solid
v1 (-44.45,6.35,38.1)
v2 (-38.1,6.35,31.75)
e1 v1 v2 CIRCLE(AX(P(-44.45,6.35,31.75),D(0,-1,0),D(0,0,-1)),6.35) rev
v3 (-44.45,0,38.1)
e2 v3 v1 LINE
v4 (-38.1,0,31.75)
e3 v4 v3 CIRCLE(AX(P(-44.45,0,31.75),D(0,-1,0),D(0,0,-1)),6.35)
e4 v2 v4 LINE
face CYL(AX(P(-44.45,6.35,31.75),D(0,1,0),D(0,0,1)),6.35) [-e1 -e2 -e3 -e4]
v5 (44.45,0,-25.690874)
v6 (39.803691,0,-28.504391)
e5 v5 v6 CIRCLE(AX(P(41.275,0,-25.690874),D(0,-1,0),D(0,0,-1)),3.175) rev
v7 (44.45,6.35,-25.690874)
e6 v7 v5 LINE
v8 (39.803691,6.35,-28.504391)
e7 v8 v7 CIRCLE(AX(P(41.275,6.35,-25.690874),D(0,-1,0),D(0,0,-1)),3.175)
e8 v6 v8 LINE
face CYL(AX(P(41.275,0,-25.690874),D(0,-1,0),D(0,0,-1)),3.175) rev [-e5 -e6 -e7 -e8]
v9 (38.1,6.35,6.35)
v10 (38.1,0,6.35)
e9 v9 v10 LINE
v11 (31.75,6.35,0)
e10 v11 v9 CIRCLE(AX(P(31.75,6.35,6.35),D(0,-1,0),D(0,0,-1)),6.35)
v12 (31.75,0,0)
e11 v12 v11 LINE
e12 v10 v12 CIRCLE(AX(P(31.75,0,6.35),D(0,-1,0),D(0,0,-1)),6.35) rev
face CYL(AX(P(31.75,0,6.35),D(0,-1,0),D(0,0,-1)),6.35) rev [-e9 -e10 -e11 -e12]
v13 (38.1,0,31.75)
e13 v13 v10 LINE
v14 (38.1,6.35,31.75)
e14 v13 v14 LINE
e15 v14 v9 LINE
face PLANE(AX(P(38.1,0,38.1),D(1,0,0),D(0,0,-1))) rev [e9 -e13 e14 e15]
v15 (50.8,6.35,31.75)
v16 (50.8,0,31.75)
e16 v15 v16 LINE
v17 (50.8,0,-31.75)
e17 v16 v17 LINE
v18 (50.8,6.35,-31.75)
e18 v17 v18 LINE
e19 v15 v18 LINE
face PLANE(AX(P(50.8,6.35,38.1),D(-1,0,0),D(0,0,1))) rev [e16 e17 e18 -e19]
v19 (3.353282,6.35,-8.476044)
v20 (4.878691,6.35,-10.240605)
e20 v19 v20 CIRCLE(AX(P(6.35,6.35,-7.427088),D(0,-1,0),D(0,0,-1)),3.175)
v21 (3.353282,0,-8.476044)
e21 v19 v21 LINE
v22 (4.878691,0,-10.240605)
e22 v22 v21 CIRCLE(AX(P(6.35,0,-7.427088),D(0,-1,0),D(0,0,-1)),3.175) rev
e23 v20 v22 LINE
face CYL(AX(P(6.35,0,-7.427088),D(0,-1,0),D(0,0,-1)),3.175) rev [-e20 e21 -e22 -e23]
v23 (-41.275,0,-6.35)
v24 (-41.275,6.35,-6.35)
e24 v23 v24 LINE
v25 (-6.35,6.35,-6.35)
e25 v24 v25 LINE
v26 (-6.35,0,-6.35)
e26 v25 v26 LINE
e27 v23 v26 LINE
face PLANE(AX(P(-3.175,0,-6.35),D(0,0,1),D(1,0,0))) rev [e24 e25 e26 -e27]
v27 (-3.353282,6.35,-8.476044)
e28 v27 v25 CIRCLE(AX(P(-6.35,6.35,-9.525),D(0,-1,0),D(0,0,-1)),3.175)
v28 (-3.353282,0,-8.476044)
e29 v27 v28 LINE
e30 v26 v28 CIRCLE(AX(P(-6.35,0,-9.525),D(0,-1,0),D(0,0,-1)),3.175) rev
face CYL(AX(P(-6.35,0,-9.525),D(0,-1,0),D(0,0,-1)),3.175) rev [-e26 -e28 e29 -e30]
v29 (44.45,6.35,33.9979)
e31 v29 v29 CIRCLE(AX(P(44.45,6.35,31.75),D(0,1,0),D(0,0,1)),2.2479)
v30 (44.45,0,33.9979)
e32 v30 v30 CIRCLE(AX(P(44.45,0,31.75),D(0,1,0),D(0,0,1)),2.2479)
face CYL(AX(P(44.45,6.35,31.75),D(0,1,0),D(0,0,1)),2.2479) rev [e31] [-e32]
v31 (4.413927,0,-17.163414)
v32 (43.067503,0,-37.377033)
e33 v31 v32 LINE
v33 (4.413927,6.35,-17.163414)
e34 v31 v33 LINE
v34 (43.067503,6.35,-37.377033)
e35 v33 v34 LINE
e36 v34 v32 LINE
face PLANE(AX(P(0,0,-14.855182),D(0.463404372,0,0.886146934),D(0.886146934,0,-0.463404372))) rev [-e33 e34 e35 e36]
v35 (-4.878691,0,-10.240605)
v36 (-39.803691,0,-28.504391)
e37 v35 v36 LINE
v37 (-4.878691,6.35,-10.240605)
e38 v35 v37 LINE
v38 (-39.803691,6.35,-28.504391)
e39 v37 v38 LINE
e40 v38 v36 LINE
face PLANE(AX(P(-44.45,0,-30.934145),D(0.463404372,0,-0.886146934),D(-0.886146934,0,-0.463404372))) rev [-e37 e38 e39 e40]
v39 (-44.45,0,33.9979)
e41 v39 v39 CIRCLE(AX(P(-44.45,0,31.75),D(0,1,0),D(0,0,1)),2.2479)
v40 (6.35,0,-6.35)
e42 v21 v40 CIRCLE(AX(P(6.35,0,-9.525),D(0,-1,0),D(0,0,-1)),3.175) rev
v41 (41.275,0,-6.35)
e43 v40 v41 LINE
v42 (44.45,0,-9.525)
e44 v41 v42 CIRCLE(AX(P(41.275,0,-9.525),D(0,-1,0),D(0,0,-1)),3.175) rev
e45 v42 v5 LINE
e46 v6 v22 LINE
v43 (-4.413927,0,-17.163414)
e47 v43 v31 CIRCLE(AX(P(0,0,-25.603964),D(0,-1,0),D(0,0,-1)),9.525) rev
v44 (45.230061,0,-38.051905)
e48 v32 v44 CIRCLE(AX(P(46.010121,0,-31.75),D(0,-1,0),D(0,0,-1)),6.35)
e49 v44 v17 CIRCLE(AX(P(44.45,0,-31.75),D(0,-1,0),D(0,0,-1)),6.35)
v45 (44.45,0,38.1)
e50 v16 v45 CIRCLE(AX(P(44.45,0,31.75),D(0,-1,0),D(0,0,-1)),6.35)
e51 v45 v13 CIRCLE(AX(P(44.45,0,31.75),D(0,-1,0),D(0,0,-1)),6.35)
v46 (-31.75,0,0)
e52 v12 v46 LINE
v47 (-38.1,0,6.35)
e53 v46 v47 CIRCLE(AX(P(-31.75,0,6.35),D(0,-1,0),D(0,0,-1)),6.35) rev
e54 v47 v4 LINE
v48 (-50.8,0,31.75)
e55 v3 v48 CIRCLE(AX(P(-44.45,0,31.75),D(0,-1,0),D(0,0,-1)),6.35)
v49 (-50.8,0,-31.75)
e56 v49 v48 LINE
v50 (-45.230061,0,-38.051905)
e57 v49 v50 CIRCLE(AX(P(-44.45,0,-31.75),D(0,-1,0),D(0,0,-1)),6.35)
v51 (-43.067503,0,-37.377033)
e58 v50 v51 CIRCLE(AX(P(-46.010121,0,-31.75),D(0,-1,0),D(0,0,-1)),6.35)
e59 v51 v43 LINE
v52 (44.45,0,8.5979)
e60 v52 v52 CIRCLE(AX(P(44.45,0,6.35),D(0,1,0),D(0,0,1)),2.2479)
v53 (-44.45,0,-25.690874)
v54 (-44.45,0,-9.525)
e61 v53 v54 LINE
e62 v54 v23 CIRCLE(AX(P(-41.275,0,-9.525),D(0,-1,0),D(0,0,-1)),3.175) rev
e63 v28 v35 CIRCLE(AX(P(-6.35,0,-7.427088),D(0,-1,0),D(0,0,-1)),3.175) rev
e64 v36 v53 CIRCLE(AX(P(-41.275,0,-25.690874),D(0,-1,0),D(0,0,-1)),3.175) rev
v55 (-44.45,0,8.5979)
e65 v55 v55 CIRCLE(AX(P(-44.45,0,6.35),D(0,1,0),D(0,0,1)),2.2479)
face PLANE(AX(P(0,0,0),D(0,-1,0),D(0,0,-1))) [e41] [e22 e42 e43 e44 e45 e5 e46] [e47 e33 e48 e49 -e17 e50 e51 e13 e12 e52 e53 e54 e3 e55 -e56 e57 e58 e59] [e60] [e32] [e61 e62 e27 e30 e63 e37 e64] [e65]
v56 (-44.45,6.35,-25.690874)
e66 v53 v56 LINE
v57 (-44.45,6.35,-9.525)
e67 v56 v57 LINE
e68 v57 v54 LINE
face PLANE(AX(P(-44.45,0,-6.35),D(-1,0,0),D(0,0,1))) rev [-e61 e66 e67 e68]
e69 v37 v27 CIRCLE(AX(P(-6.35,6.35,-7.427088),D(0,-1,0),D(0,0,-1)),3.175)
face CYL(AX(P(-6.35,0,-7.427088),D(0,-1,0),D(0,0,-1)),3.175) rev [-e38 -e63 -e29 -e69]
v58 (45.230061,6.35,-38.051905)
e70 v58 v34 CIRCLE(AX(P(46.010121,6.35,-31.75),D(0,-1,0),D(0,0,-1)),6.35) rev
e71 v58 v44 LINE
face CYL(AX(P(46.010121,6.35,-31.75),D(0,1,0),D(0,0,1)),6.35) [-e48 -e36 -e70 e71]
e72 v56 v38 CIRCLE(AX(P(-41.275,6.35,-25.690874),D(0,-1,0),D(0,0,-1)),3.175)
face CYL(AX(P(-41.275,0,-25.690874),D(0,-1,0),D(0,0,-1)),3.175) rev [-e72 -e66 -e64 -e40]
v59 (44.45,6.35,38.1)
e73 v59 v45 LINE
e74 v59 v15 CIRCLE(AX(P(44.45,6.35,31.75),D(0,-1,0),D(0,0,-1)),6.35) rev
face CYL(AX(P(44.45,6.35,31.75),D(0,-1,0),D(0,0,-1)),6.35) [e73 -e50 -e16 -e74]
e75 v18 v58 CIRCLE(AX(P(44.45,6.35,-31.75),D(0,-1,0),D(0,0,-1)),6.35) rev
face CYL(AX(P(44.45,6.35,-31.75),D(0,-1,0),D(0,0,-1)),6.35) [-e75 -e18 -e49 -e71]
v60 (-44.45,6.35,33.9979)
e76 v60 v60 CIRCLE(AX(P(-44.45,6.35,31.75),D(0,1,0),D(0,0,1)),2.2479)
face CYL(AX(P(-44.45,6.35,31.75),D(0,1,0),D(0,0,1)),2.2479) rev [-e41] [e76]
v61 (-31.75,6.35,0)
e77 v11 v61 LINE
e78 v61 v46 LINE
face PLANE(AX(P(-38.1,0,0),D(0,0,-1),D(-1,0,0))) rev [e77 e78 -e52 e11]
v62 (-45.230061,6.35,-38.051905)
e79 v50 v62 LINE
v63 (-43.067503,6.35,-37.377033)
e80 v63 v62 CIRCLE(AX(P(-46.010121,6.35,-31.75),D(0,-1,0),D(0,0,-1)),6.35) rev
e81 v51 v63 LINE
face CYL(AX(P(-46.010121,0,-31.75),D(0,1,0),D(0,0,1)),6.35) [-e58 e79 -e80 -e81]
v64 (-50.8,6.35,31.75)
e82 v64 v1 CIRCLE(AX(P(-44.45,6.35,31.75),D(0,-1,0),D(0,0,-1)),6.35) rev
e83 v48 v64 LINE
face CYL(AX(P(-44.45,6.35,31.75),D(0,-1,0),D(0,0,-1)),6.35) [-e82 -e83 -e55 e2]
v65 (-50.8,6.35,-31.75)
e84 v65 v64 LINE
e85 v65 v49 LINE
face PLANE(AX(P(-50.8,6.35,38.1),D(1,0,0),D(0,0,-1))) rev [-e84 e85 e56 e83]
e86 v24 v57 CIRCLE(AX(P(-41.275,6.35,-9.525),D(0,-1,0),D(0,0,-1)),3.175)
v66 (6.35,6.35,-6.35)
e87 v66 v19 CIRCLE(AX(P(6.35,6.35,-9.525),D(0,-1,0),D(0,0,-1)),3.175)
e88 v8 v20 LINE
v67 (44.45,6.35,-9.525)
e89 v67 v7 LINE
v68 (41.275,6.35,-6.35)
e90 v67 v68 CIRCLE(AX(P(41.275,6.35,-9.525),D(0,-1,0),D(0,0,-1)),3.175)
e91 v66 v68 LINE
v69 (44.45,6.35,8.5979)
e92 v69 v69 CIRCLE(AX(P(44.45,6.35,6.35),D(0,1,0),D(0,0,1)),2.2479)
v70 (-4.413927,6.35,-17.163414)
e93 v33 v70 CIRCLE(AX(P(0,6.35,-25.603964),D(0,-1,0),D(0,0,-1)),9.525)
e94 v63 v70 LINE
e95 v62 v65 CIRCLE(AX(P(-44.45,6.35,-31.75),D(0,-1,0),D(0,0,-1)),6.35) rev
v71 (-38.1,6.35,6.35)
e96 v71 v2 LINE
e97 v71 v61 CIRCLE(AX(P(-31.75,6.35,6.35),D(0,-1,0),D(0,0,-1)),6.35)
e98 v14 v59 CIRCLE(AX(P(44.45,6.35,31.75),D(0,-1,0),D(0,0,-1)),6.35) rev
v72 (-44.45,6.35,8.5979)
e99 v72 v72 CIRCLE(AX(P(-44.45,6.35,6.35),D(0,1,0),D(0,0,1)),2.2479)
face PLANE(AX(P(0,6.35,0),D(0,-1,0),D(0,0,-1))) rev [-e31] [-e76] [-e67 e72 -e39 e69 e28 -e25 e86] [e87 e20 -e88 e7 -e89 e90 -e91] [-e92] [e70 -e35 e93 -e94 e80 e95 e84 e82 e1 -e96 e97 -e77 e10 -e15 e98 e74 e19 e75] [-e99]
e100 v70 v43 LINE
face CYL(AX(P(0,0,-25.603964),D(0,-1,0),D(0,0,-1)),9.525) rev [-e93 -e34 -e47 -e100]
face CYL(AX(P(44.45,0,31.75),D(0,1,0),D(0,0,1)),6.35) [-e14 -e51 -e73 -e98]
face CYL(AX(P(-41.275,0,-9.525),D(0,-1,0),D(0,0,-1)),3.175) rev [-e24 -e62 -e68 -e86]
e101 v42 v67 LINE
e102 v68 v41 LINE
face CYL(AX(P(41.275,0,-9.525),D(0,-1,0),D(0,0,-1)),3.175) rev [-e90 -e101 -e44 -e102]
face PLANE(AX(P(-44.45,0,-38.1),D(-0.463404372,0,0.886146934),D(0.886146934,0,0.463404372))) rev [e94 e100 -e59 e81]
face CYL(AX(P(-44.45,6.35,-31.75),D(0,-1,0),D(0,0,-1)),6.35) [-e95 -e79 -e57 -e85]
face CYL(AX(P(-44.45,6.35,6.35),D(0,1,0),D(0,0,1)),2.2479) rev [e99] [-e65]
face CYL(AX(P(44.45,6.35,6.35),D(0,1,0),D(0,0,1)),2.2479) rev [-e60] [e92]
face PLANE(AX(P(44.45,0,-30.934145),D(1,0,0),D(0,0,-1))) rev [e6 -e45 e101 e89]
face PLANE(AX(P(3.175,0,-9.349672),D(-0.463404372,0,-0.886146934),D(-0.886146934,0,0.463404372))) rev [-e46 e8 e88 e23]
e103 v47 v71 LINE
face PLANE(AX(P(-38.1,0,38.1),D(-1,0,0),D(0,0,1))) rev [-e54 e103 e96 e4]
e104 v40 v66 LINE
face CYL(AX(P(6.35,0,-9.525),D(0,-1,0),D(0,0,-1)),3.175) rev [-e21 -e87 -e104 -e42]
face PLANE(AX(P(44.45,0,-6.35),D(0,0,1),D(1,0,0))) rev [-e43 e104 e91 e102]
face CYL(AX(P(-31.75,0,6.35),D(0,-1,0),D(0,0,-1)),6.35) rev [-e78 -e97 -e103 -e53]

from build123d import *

# Parameters (mm, degrees)
SKETCH1_W          = 101.6
SKETCH1_H          = 76.2
BASE_DEPTH         = 6.35
TUBE_NOTCH_DEPTH   = 64.816710194
MOUNTING_HOLES_D   = 4.4958
SKETCH8_W          = 76.2
SKETCH8_H          = 38.1
WHEEL_CUTOUT_DEPTH = 64.816710194
FILLET1_R          = 6.35
FILLET2_R          = 9.525
CUT_EXTRUDE1_DEPTH = 64.816710194
FILLET3_R          = 3.175


with BuildPart() as part:
    # Sketch1 → Base (new body)
    with BuildSketch(Plane(origin=(0, 0, 0), x_dir=(1, 0, 0), z_dir=(0, 1, 0))):
        Rectangle(SKETCH1_W, SKETCH1_H)
    extrude(amount=BASE_DEPTH)

    # Sketch2 → Tube notch (cut, through all)
    with BuildSketch(Plane(origin=(0, 6.35, 0), x_dir=(1, 0, 0), z_dir=(0, 1, 0))):
        Polygon((-44.45, 38.1), (0, 14.855181866), (44.45, 38.1), align=None)
    extrude(amount=-TUBE_NOTCH_DEPTH, mode=Mode.SUBTRACT)

    # Mounting holes (through all)
    with Locations(Plane(origin=(0, 6.35, 0), x_dir=(1, 0, 0), z_dir=(0, 1, 0))):
        with Locations((-44.45, -6.35), (-44.45, -31.75), (44.45, -31.75), (44.45, -6.35)):
            Hole(MOUNTING_HOLES_D / 2)

    # Sketch8 → Wheel cutout (cut, through all)
    with BuildSketch(Plane(origin=(0, 6.35, 0), x_dir=(1, 0, 0), z_dir=(0, 1, 0))):
        with Locations((0, -19.05)):
            Rectangle(SKETCH8_W, SKETCH8_H)
    extrude(amount=-WHEEL_CUTOUT_DEPTH, mode=Mode.SUBTRACT)

    # Fillet1
    # the kernel refuses this fillet: 6.35 mm, written as the material it adds along each edge
    with BuildSketch(Plane(origin=(38.1, 6.35, 0), x_dir=(0, 0, 1), z_dir=(0, -1, 0))) as fillet1_piece_1:
        with BuildLine():
            CenterArc((FILLET1_R, FILLET1_R), FILLET1_R, 180, 90)
            Line((0, FILLET1_R), (0, 0))
            Line((0, 0), (FILLET1_R, 0))
        make_face()
    extrude(amount=6.35)
    with BuildSketch(Plane(origin=(-38.1, 6.35, 0), x_dir=(0, 0, 1), z_dir=(0, -1, 0))) as fillet1_piece_2:
        with BuildLine():
            CenterArc((FILLET1_R, -FILLET1_R), FILLET1_R, 90, 90)
            Line((0, -FILLET1_R), (0, 0))
            Line((0, 0), (FILLET1_R, 0))
        make_face()
    extrude(amount=6.35)
    # the kernel refuses this fillet: 6.35 mm, written as the material it takes off along each edge
    with BuildSketch(Plane(origin=(-50.8, -15.875, 38.1), x_dir=(1, 0, 0), z_dir=(0, 1, 0)), Plane(origin=(50.8, -15.875, -38.1), x_dir=(-1, 0, 0), z_dir=(0, 1, 0)), Plane(origin=(50.8, -15.875, 38.1), x_dir=(0, 0, -1), z_dir=(0, 1, 0)), Plane(origin=(-38.1, 22.225, 38.1), x_dir=(-1, 0, 0), z_dir=(0, -1, 0)), Plane(origin=(-50.8, -15.875, -38.1), x_dir=(0, 0, 1), z_dir=(0, 1, 0))) as fillet1_2_piece_1:
        with BuildLine():
            CenterArc((FILLET1_R, FILLET1_R), FILLET1_R, 180, 90)
            Line((0, FILLET1_R), (0, 0))
            Line((0, 0), (FILLET1_R, 0))
        make_face()
    extrude(amount=38.1, mode=Mode.SUBTRACT)
    with BuildSketch(Plane(origin=(-44.45, 10.250302923, -38.1), x_dir=(-1, 0, 0), z_dir=(0, -1, 0)), Plane(origin=(44.45, 10.250302923, -38.1), x_dir=(-0.8861469338573508, 0, 0.46340437159700587), z_dir=(0, -1, 0))) as fillet1_2_piece_2:
        with BuildLine():
            CenterArc((FILLET1_R * 0.245688373095, -FILLET1_R), FILLET1_R, 90, 27.607004509)
            Line((-FILLET1_R * 0.217715998502, -FILLET1_R * 0.113853066143), (0, 0))
            Line((0, 0), (FILLET1_R * 0.245688373095, 0))
        make_face()
    extrude(amount=14.150605846, mode=Mode.SUBTRACT)
    with BuildSketch(Plane(origin=(38.1, 22.225, 38.1), x_dir=(1, 0, 0), z_dir=(0, -1, 0))) as fillet1_2_piece_3:
        with BuildLine():
            CenterArc((FILLET1_R, -FILLET1_R), FILLET1_R, 90, 90)
            Line((0, -FILLET1_R), (0, 0))
            Line((0, 0), (FILLET1_R, 0))
        make_face()
    extrude(amount=38.1, mode=Mode.SUBTRACT)

    # Fillet2
    fillet2_edges = [part.edges().sort_by_distance(p)[0] for p in [
        (0, 3.175, -14.855181866),
    ]]
    fillet(fillet2_edges, radius=FILLET2_R)

    # Sketch9 → Cut-Extrude1 (cut, through all)
    with BuildSketch(Plane(origin=(0, 6.35, 0), x_dir=(1, 0, 0), z_dir=(0, 1, 0))):
        Polygon((-44.45, 6.35), (-44.45, 30.934145493), (-3.175, 9.349671511), (-3.175, 6.35), align=None)
        Polygon((3.175, 9.349671511), (44.45, 30.934145493), (44.45, 6.35), (3.175, 6.35), align=None)
    extrude(amount=-CUT_EXTRUDE1_DEPTH, mode=Mode.SUBTRACT)

    # Fillet3
    # the kernel refuses this fillet: 3.175 mm, written as the material it adds along each edge
    with BuildSketch(Plane(origin=(-44.45, 6.35, -6.35), x_dir=(1, 0, 0), z_dir=(0, -1, 0))) as fillet3_piece_1:
        with BuildLine():
            CenterArc((FILLET3_R, -FILLET3_R), FILLET3_R, 90, 90)
            Line((0, -FILLET3_R), (0, 0))
            Line((0, 0), (FILLET3_R, 0))
        make_face()
    extrude(amount=6.35)
    with BuildSketch(Plane(origin=(-3.175, 6.35, -9.349671511), x_dir=(0, 0, 1), z_dir=(0, -1, 0))) as fillet3_piece_2:
        with BuildLine():
            CenterArc((FILLET3_R * 0.605537984618, FILLET3_R), FILLET3_R, 207.607004509, 62.392995491)
            Line((-FILLET3_R * 0.28060894924, FILLET3_R * 0.536595628403), (0, 0))
            Line((0, 0), (FILLET3_R * 0.605537984618, 0))
        make_face()
    extrude(amount=6.35)
    with BuildSketch(Plane(origin=(-3.175, 6.35, -6.35), x_dir=(-1, 0, 0), z_dir=(0, -1, 0)), Plane(origin=(44.45, 6.35, -6.35), x_dir=(-1, 0, 0), z_dir=(0, -1, 0)), Plane(origin=(3.175, 6.35, -6.35), x_dir=(0, 0, -1), z_dir=(0, -1, 0))) as fillet3_piece_3:
        with BuildLine():
            CenterArc((FILLET3_R, FILLET3_R), FILLET3_R, 180, 90)
            Line((0, FILLET3_R), (0, 0))
            Line((0, 0), (FILLET3_R, 0))
        make_face()
    extrude(amount=6.35)
    with BuildSketch(Plane(origin=(3.175, 6.35, -9.349671511), x_dir=(0, 0, 1), z_dir=(0, -1, 0))) as fillet3_piece_4:
        with BuildLine():
            CenterArc((FILLET3_R * 0.605537984618, -FILLET3_R), FILLET3_R, 90, 62.392995491)
            Line((-FILLET3_R * 0.28060894924, -FILLET3_R * 0.536595628403), (0, 0))
            Line((0, 0), (FILLET3_R * 0.605537984618, 0))
        make_face()
    extrude(amount=6.35)
    with BuildSketch(Plane(origin=(44.45, 6.35, -30.934145493), x_dir=(0, 0, 1), z_dir=(0, -1, 0)), Plane(origin=(-44.45, 6.35, -30.934145493), x_dir=(0.8861469338573508, 0, 0.463404371597006), z_dir=(0, -1, 0))) as fillet3_piece_5:
        with BuildLine():
            CenterArc((FILLET3_R * 1.65142406489, FILLET3_R), FILLET3_R, 152.392995491, 117.607004509)
            Line((FILLET3_R * 0.765277131029, FILLET3_R * 1.4634043716), (0, 0))
            Line((0, 0), (FILLET3_R * 1.65142406489, 0))
        make_face()
    extrude(amount=6.35)


solid = part.part
